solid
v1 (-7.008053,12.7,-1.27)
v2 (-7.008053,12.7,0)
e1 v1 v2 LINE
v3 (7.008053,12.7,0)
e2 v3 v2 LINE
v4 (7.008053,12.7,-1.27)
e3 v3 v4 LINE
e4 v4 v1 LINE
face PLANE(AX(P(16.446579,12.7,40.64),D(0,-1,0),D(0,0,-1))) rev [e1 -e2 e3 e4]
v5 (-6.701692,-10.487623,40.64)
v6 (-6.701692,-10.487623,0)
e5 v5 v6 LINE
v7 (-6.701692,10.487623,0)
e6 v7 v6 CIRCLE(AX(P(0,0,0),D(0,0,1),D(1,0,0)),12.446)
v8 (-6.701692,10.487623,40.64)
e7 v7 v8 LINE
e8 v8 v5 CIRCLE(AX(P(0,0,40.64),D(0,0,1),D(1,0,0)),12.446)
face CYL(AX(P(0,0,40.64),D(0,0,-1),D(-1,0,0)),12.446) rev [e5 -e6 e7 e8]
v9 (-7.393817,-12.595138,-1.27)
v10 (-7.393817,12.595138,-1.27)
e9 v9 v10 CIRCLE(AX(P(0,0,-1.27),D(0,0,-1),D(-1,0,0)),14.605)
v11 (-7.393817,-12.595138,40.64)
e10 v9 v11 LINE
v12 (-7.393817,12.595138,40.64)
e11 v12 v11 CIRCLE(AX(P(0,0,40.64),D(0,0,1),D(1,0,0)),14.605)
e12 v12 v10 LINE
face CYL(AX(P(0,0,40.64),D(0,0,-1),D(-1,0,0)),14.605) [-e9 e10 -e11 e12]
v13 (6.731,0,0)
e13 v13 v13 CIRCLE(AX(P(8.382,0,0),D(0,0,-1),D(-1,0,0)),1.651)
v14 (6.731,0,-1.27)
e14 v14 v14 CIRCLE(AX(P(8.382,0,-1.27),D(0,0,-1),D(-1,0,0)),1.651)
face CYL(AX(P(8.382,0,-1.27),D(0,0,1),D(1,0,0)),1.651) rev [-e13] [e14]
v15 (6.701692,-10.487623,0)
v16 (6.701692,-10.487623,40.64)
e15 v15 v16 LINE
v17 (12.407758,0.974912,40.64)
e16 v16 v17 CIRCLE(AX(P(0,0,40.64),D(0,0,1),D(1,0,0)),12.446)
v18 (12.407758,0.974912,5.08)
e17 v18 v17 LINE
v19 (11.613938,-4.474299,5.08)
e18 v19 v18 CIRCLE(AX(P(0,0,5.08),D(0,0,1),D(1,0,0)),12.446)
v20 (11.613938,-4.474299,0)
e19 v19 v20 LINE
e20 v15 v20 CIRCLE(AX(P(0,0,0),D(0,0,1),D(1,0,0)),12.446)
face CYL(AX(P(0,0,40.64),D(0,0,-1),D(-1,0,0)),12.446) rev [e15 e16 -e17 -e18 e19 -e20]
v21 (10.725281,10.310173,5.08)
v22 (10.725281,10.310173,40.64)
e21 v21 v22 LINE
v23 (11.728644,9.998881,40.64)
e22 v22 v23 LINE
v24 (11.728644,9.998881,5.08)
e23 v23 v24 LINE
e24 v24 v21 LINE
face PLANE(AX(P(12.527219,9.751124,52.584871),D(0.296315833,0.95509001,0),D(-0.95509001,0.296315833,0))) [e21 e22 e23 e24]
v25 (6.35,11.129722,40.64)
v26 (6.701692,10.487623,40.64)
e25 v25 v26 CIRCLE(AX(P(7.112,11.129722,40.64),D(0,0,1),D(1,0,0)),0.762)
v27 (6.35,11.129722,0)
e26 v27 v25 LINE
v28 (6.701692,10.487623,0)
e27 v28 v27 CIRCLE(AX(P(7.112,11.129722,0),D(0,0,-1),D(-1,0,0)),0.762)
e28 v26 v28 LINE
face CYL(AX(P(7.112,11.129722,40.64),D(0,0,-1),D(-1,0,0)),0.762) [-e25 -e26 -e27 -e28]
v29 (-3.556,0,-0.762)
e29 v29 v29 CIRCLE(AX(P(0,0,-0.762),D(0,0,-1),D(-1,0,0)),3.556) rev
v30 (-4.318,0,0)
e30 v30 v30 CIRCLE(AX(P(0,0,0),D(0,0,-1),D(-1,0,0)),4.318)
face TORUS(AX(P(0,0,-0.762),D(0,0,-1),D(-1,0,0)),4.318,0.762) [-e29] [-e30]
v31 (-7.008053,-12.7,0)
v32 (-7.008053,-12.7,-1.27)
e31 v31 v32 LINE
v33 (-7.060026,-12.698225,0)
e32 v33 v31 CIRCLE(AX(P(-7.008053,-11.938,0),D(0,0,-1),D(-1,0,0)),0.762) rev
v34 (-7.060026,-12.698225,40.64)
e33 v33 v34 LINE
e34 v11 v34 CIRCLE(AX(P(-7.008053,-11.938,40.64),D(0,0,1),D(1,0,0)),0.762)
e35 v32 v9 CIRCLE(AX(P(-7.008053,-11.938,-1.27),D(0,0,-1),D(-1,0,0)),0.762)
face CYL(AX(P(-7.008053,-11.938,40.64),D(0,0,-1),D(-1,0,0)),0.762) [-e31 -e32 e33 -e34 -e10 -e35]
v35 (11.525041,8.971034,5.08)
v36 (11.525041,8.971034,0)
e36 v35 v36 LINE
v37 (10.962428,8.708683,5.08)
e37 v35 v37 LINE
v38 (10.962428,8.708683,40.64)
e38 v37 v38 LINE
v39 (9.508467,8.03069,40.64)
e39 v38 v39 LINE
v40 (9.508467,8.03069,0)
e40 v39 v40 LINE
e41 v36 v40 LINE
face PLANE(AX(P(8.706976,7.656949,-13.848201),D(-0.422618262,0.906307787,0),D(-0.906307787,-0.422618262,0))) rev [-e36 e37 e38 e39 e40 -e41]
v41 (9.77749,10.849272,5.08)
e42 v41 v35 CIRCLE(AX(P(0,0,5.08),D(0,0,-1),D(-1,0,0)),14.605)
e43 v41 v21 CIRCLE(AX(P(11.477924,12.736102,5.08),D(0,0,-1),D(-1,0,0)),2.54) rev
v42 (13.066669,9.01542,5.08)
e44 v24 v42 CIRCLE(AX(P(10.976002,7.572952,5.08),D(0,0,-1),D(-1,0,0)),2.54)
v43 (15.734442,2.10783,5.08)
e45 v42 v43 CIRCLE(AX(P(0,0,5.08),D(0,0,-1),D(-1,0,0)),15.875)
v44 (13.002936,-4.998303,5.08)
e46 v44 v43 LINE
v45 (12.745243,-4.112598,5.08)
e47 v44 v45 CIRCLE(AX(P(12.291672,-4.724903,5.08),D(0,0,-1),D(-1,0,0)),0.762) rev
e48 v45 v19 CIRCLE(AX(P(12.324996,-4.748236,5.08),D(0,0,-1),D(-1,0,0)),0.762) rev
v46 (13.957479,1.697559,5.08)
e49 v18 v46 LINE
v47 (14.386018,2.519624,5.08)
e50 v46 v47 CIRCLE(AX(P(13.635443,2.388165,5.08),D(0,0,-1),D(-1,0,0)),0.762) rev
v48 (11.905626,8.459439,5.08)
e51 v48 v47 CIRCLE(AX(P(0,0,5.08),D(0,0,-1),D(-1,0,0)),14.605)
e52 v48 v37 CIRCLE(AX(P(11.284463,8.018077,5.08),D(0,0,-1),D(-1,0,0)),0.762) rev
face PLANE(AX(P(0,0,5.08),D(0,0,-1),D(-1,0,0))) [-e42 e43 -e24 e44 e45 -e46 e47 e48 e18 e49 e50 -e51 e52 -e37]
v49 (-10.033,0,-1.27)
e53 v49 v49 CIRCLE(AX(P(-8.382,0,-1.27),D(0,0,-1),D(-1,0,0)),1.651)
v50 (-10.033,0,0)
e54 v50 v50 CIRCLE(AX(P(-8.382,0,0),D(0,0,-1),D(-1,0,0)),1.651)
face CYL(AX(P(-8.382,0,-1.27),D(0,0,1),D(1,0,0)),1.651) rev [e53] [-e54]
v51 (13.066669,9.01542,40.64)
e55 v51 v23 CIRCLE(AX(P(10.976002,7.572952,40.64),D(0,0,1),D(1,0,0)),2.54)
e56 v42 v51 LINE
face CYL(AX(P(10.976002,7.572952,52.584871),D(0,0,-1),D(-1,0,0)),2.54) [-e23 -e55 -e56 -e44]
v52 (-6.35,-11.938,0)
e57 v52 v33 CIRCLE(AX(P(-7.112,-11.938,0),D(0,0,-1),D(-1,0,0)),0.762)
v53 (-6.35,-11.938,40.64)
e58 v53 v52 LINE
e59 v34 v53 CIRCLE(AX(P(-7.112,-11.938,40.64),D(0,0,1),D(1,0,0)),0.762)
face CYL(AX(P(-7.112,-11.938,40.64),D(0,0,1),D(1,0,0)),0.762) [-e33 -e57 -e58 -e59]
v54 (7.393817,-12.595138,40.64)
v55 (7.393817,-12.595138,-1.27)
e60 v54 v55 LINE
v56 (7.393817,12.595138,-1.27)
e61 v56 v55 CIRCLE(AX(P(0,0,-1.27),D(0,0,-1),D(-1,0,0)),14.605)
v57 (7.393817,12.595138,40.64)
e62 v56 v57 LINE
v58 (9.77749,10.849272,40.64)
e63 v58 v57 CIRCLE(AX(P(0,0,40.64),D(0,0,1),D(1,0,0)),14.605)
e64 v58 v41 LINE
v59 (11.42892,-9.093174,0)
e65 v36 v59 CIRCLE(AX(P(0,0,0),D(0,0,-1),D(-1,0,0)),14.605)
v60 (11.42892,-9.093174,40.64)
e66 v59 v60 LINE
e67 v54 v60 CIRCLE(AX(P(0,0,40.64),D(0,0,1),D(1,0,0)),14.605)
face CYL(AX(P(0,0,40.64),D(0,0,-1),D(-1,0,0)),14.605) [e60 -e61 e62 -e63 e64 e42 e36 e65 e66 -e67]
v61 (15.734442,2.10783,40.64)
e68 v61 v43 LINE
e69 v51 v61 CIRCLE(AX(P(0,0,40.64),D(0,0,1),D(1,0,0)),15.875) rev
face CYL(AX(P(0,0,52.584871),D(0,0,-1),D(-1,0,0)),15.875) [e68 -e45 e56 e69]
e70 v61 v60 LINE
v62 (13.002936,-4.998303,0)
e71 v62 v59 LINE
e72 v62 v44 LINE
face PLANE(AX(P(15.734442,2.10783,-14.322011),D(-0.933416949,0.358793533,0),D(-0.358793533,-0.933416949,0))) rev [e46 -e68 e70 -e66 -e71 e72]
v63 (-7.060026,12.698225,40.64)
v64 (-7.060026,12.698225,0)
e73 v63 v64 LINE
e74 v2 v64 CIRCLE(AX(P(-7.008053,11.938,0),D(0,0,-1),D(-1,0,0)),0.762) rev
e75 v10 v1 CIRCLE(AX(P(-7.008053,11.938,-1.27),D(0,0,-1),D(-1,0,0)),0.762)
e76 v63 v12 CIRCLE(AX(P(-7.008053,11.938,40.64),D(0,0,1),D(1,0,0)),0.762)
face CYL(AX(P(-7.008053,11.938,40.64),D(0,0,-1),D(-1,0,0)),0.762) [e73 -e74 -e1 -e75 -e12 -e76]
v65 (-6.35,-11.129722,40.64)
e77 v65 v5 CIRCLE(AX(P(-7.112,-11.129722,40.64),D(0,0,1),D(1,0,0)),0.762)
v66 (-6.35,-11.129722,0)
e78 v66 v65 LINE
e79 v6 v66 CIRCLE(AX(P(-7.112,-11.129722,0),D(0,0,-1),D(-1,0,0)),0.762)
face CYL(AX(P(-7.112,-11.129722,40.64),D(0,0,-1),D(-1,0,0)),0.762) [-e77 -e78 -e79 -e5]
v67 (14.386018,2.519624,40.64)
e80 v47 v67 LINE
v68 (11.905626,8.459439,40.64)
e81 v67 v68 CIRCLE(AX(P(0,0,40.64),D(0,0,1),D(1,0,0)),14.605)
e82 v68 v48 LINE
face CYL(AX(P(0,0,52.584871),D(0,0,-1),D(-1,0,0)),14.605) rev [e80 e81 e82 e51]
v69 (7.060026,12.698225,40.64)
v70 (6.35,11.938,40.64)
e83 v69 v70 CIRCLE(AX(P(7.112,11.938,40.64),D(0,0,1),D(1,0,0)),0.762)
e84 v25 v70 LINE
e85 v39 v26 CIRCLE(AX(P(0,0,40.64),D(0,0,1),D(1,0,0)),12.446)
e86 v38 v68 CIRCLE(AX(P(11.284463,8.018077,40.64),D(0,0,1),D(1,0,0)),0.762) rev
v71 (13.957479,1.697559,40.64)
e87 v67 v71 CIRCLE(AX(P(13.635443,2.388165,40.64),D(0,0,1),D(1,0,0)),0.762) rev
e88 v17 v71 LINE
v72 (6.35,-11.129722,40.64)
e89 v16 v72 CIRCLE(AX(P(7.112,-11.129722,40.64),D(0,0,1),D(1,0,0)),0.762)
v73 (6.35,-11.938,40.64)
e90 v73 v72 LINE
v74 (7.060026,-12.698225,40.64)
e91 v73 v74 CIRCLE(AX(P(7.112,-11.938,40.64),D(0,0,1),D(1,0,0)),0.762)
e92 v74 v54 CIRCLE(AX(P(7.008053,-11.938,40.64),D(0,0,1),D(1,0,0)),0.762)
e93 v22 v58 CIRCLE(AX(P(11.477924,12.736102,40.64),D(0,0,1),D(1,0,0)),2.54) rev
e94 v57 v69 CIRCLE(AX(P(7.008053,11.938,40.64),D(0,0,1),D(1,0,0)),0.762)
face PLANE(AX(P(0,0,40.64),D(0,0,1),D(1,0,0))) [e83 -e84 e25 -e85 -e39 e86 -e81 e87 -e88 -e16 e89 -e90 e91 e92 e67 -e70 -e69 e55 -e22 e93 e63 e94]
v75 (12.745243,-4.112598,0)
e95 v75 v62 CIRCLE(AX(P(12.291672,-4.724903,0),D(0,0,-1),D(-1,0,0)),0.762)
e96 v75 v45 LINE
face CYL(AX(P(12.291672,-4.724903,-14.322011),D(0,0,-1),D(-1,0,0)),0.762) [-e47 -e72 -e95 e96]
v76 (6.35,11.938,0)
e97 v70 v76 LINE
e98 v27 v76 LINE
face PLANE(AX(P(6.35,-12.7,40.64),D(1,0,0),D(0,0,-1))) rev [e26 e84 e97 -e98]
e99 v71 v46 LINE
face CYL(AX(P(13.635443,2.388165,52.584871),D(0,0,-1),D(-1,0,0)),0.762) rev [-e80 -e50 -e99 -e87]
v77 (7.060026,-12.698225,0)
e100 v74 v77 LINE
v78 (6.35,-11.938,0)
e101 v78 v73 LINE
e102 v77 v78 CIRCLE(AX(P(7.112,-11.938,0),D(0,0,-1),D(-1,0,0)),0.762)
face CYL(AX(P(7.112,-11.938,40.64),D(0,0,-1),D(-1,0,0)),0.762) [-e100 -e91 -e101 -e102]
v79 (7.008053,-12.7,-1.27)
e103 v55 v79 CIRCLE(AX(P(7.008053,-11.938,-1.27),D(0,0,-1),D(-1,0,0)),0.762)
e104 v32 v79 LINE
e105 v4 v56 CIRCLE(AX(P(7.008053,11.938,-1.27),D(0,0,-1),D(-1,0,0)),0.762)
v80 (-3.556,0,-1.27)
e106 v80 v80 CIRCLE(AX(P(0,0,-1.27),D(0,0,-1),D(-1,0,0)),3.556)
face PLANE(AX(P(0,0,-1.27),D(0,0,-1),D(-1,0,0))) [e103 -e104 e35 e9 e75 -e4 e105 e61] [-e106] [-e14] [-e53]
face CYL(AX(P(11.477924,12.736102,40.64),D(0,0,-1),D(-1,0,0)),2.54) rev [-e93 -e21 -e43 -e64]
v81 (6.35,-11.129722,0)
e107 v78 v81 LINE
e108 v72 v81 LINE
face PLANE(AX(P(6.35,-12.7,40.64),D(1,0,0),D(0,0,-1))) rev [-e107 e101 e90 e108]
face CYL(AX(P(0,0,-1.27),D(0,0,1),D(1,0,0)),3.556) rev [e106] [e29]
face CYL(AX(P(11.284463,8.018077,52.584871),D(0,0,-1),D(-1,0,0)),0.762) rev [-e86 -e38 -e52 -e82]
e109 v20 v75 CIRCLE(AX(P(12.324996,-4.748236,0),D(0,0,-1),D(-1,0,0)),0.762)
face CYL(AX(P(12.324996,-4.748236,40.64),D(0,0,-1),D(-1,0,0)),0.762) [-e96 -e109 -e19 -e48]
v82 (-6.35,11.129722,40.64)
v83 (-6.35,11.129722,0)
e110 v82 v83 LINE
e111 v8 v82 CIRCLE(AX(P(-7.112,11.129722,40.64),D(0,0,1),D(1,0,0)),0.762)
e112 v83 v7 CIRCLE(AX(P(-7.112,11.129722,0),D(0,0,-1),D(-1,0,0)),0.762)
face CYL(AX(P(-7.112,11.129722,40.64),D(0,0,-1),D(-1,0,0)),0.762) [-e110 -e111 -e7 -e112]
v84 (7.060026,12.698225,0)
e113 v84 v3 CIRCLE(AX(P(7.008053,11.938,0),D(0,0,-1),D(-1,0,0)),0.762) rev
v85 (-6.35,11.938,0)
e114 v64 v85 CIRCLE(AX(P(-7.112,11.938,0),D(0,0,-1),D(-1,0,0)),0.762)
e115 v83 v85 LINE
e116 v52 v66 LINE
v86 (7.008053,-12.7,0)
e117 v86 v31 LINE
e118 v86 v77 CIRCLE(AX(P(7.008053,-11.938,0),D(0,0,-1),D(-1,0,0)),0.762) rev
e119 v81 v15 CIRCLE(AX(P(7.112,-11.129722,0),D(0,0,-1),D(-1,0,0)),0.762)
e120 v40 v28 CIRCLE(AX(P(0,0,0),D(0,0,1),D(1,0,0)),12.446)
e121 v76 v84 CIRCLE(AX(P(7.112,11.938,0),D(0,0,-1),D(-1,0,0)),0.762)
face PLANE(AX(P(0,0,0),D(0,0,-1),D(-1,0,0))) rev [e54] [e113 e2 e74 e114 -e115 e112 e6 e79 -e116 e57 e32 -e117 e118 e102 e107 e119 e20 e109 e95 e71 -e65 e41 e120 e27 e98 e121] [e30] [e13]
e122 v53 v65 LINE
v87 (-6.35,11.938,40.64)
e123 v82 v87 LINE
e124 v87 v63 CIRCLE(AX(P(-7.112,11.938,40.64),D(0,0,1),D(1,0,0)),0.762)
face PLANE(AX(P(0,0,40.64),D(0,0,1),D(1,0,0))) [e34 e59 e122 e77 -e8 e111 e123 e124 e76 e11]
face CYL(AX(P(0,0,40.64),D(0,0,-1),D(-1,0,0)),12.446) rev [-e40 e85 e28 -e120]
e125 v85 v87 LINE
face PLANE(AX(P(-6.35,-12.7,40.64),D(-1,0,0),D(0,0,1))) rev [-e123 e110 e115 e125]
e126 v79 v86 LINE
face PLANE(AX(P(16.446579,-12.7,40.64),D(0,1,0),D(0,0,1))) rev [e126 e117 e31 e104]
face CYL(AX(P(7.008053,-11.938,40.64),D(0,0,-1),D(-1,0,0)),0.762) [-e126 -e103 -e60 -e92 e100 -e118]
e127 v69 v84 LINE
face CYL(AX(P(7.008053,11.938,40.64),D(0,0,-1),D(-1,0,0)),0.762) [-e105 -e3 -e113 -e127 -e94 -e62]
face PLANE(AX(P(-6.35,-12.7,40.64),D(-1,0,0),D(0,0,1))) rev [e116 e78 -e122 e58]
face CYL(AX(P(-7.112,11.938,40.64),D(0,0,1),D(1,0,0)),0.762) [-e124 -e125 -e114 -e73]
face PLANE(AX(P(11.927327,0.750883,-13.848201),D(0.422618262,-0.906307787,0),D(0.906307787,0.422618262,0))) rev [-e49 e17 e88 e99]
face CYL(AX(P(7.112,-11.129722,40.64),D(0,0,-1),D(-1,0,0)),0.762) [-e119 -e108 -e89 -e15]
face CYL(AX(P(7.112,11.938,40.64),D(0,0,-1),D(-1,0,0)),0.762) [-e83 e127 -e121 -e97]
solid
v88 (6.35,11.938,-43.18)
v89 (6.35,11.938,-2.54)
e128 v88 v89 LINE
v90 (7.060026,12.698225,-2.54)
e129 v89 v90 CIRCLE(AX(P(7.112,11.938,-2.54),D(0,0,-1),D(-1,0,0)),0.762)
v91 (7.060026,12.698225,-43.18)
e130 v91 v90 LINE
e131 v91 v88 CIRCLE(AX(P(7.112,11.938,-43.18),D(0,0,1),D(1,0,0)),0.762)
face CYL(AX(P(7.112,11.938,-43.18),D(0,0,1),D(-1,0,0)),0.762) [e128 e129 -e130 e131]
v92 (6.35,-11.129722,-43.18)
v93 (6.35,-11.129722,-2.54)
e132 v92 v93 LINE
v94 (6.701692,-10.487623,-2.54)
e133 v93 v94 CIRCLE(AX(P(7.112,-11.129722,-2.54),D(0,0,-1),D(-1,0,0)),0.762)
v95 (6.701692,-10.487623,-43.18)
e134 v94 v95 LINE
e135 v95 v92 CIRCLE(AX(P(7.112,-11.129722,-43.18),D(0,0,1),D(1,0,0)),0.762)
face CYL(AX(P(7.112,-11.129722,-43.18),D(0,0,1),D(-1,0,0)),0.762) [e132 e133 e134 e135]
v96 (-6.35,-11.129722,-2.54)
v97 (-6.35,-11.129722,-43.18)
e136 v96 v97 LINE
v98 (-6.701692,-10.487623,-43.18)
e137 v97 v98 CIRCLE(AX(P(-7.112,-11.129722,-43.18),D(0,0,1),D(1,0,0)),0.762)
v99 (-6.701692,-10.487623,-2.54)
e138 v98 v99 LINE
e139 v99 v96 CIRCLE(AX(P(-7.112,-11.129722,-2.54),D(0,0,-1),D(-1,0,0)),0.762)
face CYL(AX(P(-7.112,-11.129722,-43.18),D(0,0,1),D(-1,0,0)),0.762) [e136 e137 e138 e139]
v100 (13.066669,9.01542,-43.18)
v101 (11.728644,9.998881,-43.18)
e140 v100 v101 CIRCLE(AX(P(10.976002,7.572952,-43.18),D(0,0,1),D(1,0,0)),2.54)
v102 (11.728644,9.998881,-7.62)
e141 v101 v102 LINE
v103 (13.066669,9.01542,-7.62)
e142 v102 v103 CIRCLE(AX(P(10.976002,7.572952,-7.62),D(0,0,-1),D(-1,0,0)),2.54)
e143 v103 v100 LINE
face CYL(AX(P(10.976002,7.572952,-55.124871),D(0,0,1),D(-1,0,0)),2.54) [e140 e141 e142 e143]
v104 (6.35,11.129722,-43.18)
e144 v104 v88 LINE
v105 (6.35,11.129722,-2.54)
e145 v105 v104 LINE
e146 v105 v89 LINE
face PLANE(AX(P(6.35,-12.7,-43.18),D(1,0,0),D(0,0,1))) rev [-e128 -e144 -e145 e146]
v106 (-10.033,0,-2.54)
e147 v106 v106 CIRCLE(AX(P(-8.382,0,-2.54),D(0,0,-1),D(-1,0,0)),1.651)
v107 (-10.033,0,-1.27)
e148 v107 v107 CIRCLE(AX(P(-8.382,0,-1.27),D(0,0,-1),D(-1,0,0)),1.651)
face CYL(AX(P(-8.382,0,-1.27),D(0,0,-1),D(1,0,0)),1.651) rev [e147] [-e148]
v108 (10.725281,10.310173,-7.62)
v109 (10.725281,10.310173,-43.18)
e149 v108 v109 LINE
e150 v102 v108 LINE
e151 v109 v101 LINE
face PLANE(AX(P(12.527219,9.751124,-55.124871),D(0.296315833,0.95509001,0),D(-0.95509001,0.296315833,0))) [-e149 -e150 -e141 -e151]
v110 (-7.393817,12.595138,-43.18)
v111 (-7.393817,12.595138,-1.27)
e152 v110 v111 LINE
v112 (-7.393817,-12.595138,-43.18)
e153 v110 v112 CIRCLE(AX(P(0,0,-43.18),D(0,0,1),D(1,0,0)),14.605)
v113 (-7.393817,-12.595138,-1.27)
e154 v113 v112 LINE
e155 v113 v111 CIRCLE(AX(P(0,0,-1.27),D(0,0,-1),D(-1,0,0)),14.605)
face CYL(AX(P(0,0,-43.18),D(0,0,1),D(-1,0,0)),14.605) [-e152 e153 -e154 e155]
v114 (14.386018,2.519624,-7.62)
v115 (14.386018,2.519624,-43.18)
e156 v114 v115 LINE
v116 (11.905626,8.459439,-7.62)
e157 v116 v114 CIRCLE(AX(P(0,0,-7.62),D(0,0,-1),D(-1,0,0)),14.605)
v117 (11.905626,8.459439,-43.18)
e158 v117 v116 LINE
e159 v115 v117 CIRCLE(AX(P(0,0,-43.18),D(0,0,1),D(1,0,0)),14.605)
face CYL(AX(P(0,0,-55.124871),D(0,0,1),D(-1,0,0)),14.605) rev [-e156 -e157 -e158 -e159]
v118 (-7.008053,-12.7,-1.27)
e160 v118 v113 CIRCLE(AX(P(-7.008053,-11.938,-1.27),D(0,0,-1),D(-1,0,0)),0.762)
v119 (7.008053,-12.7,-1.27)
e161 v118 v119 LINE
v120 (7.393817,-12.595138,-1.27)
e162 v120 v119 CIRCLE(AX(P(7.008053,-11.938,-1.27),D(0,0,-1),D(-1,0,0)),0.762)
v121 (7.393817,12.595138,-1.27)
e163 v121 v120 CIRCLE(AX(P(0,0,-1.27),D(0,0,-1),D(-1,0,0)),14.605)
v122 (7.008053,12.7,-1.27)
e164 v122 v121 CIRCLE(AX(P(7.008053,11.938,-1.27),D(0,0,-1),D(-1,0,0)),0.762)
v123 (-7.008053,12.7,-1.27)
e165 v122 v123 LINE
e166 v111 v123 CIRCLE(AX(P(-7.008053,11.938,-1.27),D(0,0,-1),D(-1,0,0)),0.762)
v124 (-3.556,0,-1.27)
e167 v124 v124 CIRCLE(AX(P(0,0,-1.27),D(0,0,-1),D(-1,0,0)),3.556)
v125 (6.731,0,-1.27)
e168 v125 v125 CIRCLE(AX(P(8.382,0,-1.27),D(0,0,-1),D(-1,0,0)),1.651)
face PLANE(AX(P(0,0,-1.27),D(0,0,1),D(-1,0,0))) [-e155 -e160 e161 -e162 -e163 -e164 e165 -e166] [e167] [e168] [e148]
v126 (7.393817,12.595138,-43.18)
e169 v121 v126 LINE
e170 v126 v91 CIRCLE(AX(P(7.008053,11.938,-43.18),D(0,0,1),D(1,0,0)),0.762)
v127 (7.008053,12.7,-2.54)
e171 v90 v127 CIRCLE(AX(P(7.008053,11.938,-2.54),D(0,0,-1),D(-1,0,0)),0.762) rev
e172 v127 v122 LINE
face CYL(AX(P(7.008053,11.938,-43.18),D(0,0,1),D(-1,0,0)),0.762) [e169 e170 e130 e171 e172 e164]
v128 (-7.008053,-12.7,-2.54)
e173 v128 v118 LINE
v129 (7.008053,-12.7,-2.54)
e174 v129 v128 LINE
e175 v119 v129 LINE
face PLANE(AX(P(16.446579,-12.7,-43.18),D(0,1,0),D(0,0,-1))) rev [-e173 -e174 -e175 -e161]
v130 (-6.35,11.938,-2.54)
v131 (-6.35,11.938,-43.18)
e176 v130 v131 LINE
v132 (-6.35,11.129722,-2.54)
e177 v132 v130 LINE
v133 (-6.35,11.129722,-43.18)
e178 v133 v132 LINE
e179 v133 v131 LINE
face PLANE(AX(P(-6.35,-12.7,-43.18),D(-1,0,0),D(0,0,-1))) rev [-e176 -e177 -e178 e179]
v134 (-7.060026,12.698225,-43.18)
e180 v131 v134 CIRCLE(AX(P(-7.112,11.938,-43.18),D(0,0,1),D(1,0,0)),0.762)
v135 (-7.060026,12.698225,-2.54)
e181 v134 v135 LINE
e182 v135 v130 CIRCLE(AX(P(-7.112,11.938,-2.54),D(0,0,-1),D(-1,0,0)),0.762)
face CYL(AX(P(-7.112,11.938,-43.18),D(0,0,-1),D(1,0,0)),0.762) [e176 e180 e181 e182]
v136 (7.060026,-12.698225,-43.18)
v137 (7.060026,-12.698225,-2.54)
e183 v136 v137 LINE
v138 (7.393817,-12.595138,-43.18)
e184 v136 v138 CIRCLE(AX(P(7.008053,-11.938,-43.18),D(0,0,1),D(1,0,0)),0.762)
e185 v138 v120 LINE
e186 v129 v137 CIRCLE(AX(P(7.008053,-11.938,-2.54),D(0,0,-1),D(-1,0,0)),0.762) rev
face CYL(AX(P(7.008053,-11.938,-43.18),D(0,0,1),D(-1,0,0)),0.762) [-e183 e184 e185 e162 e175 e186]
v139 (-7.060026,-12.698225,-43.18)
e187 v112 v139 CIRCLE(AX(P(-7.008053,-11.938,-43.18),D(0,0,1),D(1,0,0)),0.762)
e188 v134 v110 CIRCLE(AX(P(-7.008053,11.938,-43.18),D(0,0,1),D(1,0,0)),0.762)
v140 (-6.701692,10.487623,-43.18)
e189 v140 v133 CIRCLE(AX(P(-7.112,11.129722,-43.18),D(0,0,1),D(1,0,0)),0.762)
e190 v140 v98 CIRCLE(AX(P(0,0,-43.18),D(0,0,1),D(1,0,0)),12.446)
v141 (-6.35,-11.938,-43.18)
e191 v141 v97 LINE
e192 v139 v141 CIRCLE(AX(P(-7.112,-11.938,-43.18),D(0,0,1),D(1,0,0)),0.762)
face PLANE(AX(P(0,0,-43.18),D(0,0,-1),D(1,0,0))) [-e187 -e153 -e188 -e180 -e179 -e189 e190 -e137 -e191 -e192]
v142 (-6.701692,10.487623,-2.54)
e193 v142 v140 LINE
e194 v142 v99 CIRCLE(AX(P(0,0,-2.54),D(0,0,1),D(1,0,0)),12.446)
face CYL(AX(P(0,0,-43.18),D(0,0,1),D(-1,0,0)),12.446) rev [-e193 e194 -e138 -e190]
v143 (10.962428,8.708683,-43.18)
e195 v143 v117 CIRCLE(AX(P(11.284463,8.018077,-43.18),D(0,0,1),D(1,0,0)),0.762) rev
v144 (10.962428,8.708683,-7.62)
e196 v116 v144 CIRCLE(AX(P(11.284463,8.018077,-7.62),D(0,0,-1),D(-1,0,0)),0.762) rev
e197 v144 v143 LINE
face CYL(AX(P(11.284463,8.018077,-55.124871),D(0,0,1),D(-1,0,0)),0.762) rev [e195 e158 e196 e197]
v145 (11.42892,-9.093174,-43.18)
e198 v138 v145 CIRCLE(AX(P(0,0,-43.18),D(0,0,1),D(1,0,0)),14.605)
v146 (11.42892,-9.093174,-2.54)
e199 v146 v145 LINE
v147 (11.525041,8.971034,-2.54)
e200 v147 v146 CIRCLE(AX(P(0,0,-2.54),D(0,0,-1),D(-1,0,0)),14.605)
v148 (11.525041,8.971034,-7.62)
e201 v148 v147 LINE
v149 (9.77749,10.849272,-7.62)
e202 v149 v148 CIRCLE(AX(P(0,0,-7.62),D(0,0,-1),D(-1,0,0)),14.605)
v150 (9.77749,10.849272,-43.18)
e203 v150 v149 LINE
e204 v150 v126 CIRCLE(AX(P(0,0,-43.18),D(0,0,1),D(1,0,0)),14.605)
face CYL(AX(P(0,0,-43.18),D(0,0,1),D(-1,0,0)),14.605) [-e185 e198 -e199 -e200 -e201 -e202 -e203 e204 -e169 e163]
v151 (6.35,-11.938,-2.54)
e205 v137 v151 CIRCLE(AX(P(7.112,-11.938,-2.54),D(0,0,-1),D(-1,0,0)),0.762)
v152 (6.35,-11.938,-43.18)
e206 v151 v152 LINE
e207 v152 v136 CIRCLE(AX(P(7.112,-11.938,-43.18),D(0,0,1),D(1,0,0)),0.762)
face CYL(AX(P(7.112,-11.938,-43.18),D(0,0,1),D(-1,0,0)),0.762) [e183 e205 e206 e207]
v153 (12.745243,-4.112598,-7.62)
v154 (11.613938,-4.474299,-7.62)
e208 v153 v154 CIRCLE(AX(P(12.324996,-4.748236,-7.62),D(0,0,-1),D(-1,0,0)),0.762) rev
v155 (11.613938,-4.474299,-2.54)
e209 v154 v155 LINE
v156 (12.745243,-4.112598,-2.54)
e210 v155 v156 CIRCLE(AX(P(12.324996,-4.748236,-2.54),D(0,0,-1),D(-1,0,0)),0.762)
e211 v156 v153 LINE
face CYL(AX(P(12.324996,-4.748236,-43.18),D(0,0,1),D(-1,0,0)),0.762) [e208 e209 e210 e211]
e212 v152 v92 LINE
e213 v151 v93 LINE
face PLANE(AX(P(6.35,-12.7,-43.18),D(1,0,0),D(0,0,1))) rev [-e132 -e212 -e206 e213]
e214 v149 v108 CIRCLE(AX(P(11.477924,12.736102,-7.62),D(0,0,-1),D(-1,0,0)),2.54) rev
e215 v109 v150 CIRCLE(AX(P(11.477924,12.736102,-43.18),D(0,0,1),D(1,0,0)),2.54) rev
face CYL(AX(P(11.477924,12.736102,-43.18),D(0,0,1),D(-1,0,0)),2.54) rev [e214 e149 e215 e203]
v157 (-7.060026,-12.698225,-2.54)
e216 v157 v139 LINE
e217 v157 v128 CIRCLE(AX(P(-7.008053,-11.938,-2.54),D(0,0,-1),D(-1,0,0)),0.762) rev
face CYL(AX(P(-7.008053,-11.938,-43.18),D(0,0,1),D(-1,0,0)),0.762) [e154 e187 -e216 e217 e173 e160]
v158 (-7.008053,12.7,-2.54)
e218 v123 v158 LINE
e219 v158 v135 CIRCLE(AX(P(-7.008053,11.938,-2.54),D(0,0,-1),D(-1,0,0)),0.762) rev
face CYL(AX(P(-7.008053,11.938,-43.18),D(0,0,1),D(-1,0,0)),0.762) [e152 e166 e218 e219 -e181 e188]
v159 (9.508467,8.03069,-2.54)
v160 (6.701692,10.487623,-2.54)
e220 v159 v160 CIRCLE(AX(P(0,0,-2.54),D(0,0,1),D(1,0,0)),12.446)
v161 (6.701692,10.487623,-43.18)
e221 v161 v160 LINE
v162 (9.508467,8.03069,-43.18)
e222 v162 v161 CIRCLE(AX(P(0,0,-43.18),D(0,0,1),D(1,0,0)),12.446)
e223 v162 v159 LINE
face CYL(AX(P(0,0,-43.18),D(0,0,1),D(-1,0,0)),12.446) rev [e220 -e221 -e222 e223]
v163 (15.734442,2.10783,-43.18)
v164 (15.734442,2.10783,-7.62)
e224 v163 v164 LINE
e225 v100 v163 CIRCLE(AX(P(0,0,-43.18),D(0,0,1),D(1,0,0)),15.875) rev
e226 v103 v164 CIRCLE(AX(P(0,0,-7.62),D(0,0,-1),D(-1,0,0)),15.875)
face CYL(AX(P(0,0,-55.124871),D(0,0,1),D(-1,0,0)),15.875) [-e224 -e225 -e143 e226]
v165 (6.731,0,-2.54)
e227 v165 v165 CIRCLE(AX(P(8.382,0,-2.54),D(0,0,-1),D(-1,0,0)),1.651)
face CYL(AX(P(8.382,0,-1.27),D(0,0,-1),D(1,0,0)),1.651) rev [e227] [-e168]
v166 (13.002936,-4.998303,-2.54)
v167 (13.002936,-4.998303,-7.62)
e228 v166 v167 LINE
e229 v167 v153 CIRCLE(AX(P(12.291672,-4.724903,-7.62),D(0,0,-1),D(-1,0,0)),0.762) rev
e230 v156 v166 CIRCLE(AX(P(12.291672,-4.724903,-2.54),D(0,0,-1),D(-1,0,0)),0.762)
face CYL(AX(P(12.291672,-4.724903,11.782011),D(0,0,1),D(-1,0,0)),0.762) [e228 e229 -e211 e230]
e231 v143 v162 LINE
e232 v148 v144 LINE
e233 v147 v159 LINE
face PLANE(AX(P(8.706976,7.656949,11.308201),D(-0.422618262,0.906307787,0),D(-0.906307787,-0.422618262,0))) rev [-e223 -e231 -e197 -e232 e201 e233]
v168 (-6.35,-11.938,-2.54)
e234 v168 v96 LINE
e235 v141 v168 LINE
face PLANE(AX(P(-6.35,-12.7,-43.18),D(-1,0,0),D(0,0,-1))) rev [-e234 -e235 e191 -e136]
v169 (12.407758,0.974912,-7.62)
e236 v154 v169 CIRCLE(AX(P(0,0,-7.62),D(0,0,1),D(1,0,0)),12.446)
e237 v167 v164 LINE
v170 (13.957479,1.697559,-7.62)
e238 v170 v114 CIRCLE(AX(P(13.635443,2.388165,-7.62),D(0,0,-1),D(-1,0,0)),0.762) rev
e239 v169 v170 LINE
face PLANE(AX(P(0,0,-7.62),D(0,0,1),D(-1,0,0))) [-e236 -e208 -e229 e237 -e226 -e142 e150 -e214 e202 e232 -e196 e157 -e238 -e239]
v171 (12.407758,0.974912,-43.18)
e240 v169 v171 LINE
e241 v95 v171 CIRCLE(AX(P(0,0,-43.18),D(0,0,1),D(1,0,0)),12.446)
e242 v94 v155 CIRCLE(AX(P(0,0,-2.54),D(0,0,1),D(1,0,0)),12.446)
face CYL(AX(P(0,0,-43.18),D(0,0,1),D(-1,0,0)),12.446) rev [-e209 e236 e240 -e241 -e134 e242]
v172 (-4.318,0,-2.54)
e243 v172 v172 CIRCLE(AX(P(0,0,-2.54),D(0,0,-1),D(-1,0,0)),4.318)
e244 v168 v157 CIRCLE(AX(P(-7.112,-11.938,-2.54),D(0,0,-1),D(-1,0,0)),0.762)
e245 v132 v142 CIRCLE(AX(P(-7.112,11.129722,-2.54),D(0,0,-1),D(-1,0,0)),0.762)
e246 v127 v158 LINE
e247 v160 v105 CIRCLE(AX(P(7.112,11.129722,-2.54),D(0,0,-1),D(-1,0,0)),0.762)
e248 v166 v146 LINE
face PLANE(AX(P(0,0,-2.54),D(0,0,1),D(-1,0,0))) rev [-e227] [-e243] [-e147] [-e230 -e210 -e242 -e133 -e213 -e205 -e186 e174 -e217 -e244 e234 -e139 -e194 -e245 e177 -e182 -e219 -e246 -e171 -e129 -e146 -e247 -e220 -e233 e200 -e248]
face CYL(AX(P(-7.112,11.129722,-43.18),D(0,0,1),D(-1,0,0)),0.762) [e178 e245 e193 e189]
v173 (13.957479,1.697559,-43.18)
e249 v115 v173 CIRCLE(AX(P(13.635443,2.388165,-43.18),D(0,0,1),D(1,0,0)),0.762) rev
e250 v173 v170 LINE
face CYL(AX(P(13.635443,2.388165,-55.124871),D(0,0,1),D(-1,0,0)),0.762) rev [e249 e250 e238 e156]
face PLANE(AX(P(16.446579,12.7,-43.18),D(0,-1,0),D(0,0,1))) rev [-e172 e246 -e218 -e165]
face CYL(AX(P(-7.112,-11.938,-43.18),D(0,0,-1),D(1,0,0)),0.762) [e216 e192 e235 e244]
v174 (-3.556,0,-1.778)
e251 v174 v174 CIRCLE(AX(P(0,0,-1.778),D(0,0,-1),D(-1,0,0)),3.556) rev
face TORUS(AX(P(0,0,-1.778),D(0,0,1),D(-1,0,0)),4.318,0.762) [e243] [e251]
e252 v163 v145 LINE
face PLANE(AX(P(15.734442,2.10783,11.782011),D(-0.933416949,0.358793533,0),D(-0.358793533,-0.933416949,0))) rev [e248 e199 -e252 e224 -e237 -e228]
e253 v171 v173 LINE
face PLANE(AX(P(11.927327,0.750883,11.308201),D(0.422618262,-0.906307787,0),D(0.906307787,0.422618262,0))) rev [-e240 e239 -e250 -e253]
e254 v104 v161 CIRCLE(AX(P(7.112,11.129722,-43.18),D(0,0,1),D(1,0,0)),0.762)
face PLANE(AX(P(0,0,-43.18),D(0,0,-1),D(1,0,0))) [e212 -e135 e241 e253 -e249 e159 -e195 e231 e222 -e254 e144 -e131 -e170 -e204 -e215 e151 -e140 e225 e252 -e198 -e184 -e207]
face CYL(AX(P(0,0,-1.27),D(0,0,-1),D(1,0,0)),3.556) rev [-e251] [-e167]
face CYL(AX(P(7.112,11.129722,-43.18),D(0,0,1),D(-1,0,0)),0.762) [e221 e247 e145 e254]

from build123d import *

# Parameters (mm, degrees)
SKETCH1_R           = 14.605
SKETCH1_R_2         = 12.446
BOSS_EXTRUDE1_DEPTH = 40.64
BOSS_EXTRUDE2_START = 1.27
SKETCH2_R           = 14.605
SKETCH2_R_2         = 3.556
SKETCH2_R_3         = 1.651
BOSS_EXTRUDE2_DEPTH = 1.27
SKETCH3_W           = 34.056453184
SKETCH3_H           = 6.418177278
SKETCH3_W_2         = 34.979066167
SKETCH3_H_2         = 5.575791511
CUT_EXTRUDE1_DEPTH  = 47.723229233
SKETCH4_W           = 12.7
SKETCH4_H           = 40.64
CUT_EXTRUDE2_DEPTH  = 51.100654936
CUT_EXTRUDE3_DEPTH  = 40.64
BOSS_EXTRUDE3_DEPTH = 41.91
SKETCH7_R           = 15.875
SKETCH7_R_2         = 14.605
CUT_EXTRUDE4_DEPTH  = 6.35
CUT_EXTRUDE5_DEPTH  = 5.08
CUT_EXTRUDE6_REACH  = 48.533
BOSS_EXTRUDE5_DEPTH = 35.56
FILLET1_R           = 0.762
FILLET2_R           = 2.54


with BuildPart() as part:
    # Sketch1 → Boss-Extrude1 (new body)
    with BuildSketch(Plane.XY):
        Circle(SKETCH1_R)
        Circle(SKETCH1_R_2, mode=Mode.SUBTRACT)
    extrude(amount=BOSS_EXTRUDE1_DEPTH)

    # Sketch2 → Boss-Extrude2 (add)
    with BuildSketch(Plane(origin=(0, 0, 0), x_dir=(-1, 0, 0), z_dir=(0, 0, -1)).offset(BOSS_EXTRUDE2_START)):
        Circle(SKETCH2_R)
        Circle(SKETCH2_R_2, mode=Mode.SUBTRACT)
        with Locations((-8.382, 0)):
            Circle(SKETCH2_R_3, mode=Mode.SUBTRACT)
        with Locations((8.382, 0)):
            Circle(SKETCH2_R_3, mode=Mode.SUBTRACT)
    extrude(amount=-BOSS_EXTRUDE2_DEPTH)

    # Sketch3 → Cut-Extrude1 (cut, through all)
    with BuildSketch(Plane(origin=(0, 0, -1.27), x_dir=(-1, 0, 0), z_dir=(0, 0, -1))):
        with Locations((0.581647316, 15.909088639)):
            Rectangle(SKETCH3_W, SKETCH3_H)
        with Locations((1.042953807, -15.487895756)):
            Rectangle(SKETCH3_W_2, SKETCH3_H_2)
    extrude(amount=-CUT_EXTRUDE1_DEPTH, mode=Mode.SUBTRACT)

    # Sketch4 → Cut-Extrude2 (cut, through all)
    with BuildSketch(Plane(origin=(0, 12.7, 0), x_dir=(1, 0, 0), z_dir=(0, 1, 0))):
        with Locations((0, -20.32)):
            Rectangle(SKETCH4_W, SKETCH4_H)
    extrude(amount=-CUT_EXTRUDE2_DEPTH, mode=Mode.SUBTRACT)

    # Sketch5 → Cut-Extrude3 (cut)
    with BuildSketch(Plane.XY.offset(40.64)):
        Polygon((8.706975565, 7.656948551), (15.156085268, 10.664217794), (18.376436422, 3.758152456), (11.927326719, 0.750883214), align=None)
    extrude(amount=-CUT_EXTRUDE3_DEPTH, mode=Mode.SUBTRACT)

    # Sketch6 → Boss-Extrude3 (add)
    with BuildSketch(Plane(origin=(0, 0, -1.27), x_dir=(-1, 0, 0), z_dir=(0, 0, -1))):
        with BuildLine():
            Line((-12.527218586, 9.751124012), (-10.16966665, 10.48255242))
            ThreePointArc((-10.16966665, 10.48255242), (-10.873649709, 9.75037266), (-11.525041099, 8.971034091))
            ThreePointArc((-11.525041099, 8.971034091), (-13.467409843, 5.651096984), (-14.475687068, 1.93920316))
            ThreePointArc((-14.475687068, 1.93920316), (-14.575462242, 0.928399389), (-14.604741501, -0.086894693))
            Line((-14.604741501, -0.086894693), (-15.734442466, 2.107829522))
            ThreePointArc((-15.734442466, 2.107829522), (-14.638488959, 6.142496722), (-12.527218586, 9.751124012))
        make_face()
    extrude(amount=-BOSS_EXTRUDE3_DEPTH)

    # Sketch7 → Cut-Extrude4 (cut)
    with BuildSketch(Plane(origin=(0, 0, -1.27), x_dir=(-1, 0, 0), z_dir=(0, 0, -1))):
        Circle(SKETCH7_R)
        Circle(SKETCH7_R_2, mode=Mode.SUBTRACT)
    extrude(amount=-CUT_EXTRUDE4_DEPTH, mode=Mode.SUBTRACT)

    # Sketch8 → Cut-Extrude5 (cut)
    with BuildSketch(Plane.XY):
        with BuildLine():
            Line((14.475687068, 1.93920316), (12.407758156, 0.974912072))
            ThreePointArc((12.407758156, 0.974912072), (12.445878018, -0.05510311), (12.398639212, -1.084740374))
            Line((12.398639212, -1.084740374), (14.549423566, -1.272909623))
            ThreePointArc((14.549423566, -1.272909623), (14.601153344, 0.335180604), (14.475687068, 1.93920316))
        make_face()
        with BuildLine():
            Line((14.549423566, -1.272909623), (12.398639212, -1.084740374))
            ThreePointArc((12.398639212, -1.084740374), (12.226851946, -2.325297292), (11.931259886, -3.542309069))
            Line((11.931259886, -3.542309069), (13.780666558, -4.837277563))
            ThreePointArc((13.780666558, -4.837277563), (14.276718156, -3.079179062), (14.549423566, -1.272909623))
        make_face()
    extrude(amount=CUT_EXTRUDE5_DEPTH, mode=Mode.SUBTRACT)

    # Cut-Extrude6: up to this face of the body (flat: up to its plane)
    cut_extrude6_end = Plane(part.part.faces().sort_by_distance((9.524357094, -7.422304107, 0))[0])
    # Sketch11 → Cut-Extrude6 (cut, up to the picked face)
    with BuildSketch(Plane.XY.offset(40.64), mode=Mode.PRIVATE) as cut_extrude6_sk1:
        Polygon((15.734442466, 2.107829522), (11.428920073, -9.093173867), (14.392518886, -10.232343334), (18.698041279, 0.968660056), align=None)
    cut_extrude6_tool1 = split(extrude(cut_extrude6_sk1.sketch, amount=-CUT_EXTRUDE6_REACH, mode=Mode.PRIVATE), bisect_by=cut_extrude6_end, keep=Keep.BOTH, mode=Mode.PRIVATE)
    add(cut_extrude6_tool1.solids().sort_by(Axis((15.063481, -4.062257, 40.64), (0, 0, -1)))[0], mode=Mode.SUBTRACT)

    # Sketch12 → Boss-Extrude5 (add)
    with BuildSketch(Plane.XY.offset(40.64)):
        Polygon((14.577046288, -0.903186872), (15.734442466, 2.107829522), (15.155744377, 2.330273663), (13.998348199, -0.680742731), align=None)
    extrude(amount=-BOSS_EXTRUDE5_DEPTH)

    # Fillet1
    # the kernel refuses this fillet: 0.762 mm, written as the material it adds along each edge
    with BuildSketch(Plane(origin=(14.475687068, 1.93920316, 40.64), x_dir=(-0.1526781379658876, 0.9882759666142191, 0), z_dir=(0, 0, -1))) as fillet1_piece_1:
        with BuildLine():
            CenterArc((0.57198511, -0.76184596), FILLET1_R, 88.847914045, 74.934246566)
            Line((-0.159692452, -0.549026914), (0, 0))
            ThreePointArc((0, 0), (0.29365307, 0.002952442), (0.587306139, 0))
        make_face()
    extrude(amount=35.56)
    with BuildSketch(Plane(origin=(11.525041099, 8.971034091, 40.64), x_dir=(0.5968718617370223, -0.8023365756754336, 0), z_dir=(0, 0, -1))) as fillet1_piece_2:
        with BuildLine():
            CenterArc((0.62099819, 0.761818426), FILLET1_R, 191.646188227, 79.60463439)
            Line((-0.12531439, 0.60799537), (0, 0))
            ThreePointArc((0, 0), (0.318816035, -0.00348017), (0.63763207, 0))
        make_face()
    extrude(amount=35.56)
    # the kernel refuses this fillet: 0.762 mm, written as the material it takes off along each edge
    with BuildSketch(Plane(origin=(0, 0, 0), x_dir=(-1, 0, 0), z_dir=(0, -1, 0))) as fillet1_2_piece_1:
        with BuildLine():
            CenterArc((3.556 + FILLET1_R, FILLET1_R), FILLET1_R, 180, 90)
            Line((3.556, FILLET1_R), (3.556, 0))
            Line((3.556, 0), (3.556 + FILLET1_R, 0))
        make_face()
    revolve(axis=Axis((0, 0, 0), (0, 0, -1)), mode=Mode.SUBTRACT)
    with BuildSketch(Plane(origin=(11.931259886, -3.542309069, 0), x_dir=(-0.32230782021248533, -0.9466349185561855, 0), z_dir=(0, 0, 1))) as fillet1_2_piece_2:
        with BuildLine():
            CenterArc((1.014668485, 0.761403744), FILLET1_R, 163.802549626, 103.930693134)
            Line((0.282915237, 0.973962404), (0, 0))
            ThreePointArc((0, 0), (0.492264909, 0.009738855), (0.984529818, 0))
        make_face()
    extrude(amount=5.08, mode=Mode.SUBTRACT)
    with BuildSketch(Plane(origin=(13.216640292, -4.442342119, 0), x_dir=(-0.35879353276176223, -0.9334169490899199, 0), z_dir=(0, 0, 1))) as fillet1_2_piece_3:
        with BuildLine():
            CenterArc((FILLET1_R * 0.781652785228, -FILLET1_R), FILLET1_R, 90, 76.026121217)
            Line((-FILLET1_R * 0.1887531327, -FILLET1_R * 0.758520488551), (0, 0))
            Line((0, 0), (FILLET1_R * 0.781652785228, 0))
        make_face()
    extrude(amount=5.08, mode=Mode.SUBTRACT)
    with BuildSketch(Plane(origin=(-7.212213599, 12.7, -1.794261411), x_dir=(1, 0, 0), z_dir=(0, 0, 1)), Plane(origin=(-7.212213599, -12.7, 41.164261411), x_dir=(1, 0, 0), z_dir=(0, 0, -1))) as fillet1_2_piece_4:
        with BuildLine():
            CenterArc((0.204160731, -0.762), FILLET1_R, 90, 30.414529102)
            ThreePointArc((-0.181603647, -0.104862385), (-0.090990033, -0.052105246), (0, 0))
            Line((0, 0), (0.204160731, 0))
        make_face()
    extrude(amount=42.958522823, mode=Mode.SUBTRACT)
    with BuildSketch(Plane(origin=(7.212213599, 12.7, -1.794261411), x_dir=(0.8659975867148599, -0.500048177482969, -1.8558242316030044e-14), z_dir=(0, 0, 1)), Plane(origin=(7.212213599, -12.7, 41.164261411), x_dir=(0.8659975867148587, 0.5000481774829708, -1.8313973834794986e-14), z_dir=(0, 0, -1))) as fillet1_2_piece_5:
        with BuildLine():
            CenterArc((0.204234011, -0.761980363), FILLET1_R, 89.588658346, 30.414529102)
            Line((-0.176802701, -0.102090202), (0, 0))
            ThreePointArc((0, 0), (0.104852282, 0.000376383), (0.209704565, 0))
        make_face()
    extrude(amount=42.958522823, mode=Mode.SUBTRACT)
    with BuildSketch(Plane(origin=(-6.35, 10.704224213, 41.703745389), x_dir=(0, 1, 0), z_dir=(0, 0, -1))) as fillet1_2_piece_6:
        with BuildLine():
            CenterArc((0.425498156, -0.762), FILLET1_R, 90, 57.421029607)
            ThreePointArc((-0.216601212, -0.351692308), (-0.106841566, -0.176744751), (0, 0))
            Line((0, 0), (0.425498156, 0))
        make_face()
    extrude(amount=41.703745389, mode=Mode.SUBTRACT)
    with BuildSketch(Plane(origin=(-6.35, -10.704224213, 41.703745389), x_dir=(0, -1, 0), z_dir=(0, 0, -1)), Plane(origin=(6.35, 10.704224213, 41.703745389), x_dir=(0, 1, 0), z_dir=(0, 0, -1))) as fillet1_2_piece_7:
        with BuildLine():
            CenterArc((0.425498156, 0.762), FILLET1_R, 212.578970393, 57.421029607)
            ThreePointArc((-0.216601212, 0.351692308), (-0.106841566, 0.176744751), (0, 0))
            Line((0, 0), (0.425498156, 0))
        make_face()
    extrude(amount=41.703745389, mode=Mode.SUBTRACT)
    with BuildSketch(Plane(origin=(6.35, -10.704224213, 41.703745389), x_dir=(0.8514689576122441, 0.5244050097231324, 0), z_dir=(0, 0, -1))) as fillet1_2_piece_8:
        with BuildLine():
            CenterArc((0.425685981, 0.761895088), FILLET1_R, 211.628197432, 57.421029608)
            Line((-0.223133364, 0.362298471), (0, 0))
            ThreePointArc((0, 0), (0.206520922, 0.001713556), (0.413041843, 0))
        make_face()
    extrude(amount=41.703745389, mode=Mode.SUBTRACT)
    with BuildSketch(Plane(origin=(6.35, -12.7, 42.545), x_dir=(1, 0, 0), z_dir=(0, 0, -1)), Plane(origin=(-6.35, -12.7, 0), x_dir=(-1, 0, 0), z_dir=(0, 0, 1))) as fillet1_2_piece_9:
        with BuildLine():
            CenterArc((FILLET1_R, -FILLET1_R), FILLET1_R, 90, 90)
            Line((0, -FILLET1_R), (0, 0))
            Line((0, 0), (FILLET1_R, 0))
        make_face()
    extrude(amount=42.545, mode=Mode.SUBTRACT)
    with BuildSketch(Plane(origin=(-6.35, 12.7, 0), x_dir=(-1, 0, 0), z_dir=(0, 0, 1)), Plane(origin=(6.35, 12.7, 42.545), x_dir=(1, 0, 0), z_dir=(0, 0, -1))) as fillet1_2_piece_10:
        with BuildLine():
            CenterArc((FILLET1_R, FILLET1_R), FILLET1_R, 180, 90)
            Line((0, FILLET1_R), (0, 0))
            Line((0, 0), (FILLET1_R, 0))
        make_face()
    extrude(amount=42.545, mode=Mode.SUBTRACT)

    # Fillet2
    fillet2_edges = [part.edges().sort_by_distance(p)[0] for p in [
        (12.527218586, 9.751124012, 22.86),
        (10.16966665, 10.48255242, 22.86),
    ]]
    fillet(fillet2_edges, radius=FILLET2_R)


with BuildPart() as body_2:
    # Mirror1: mirrored copy
    add(part.part.mirror(Plane(origin=(0, 0, -1.27), x_dir=(1, 0, 0), z_dir=(0, 0, -1))))


solid = Compound([part.part, body_2.part])
